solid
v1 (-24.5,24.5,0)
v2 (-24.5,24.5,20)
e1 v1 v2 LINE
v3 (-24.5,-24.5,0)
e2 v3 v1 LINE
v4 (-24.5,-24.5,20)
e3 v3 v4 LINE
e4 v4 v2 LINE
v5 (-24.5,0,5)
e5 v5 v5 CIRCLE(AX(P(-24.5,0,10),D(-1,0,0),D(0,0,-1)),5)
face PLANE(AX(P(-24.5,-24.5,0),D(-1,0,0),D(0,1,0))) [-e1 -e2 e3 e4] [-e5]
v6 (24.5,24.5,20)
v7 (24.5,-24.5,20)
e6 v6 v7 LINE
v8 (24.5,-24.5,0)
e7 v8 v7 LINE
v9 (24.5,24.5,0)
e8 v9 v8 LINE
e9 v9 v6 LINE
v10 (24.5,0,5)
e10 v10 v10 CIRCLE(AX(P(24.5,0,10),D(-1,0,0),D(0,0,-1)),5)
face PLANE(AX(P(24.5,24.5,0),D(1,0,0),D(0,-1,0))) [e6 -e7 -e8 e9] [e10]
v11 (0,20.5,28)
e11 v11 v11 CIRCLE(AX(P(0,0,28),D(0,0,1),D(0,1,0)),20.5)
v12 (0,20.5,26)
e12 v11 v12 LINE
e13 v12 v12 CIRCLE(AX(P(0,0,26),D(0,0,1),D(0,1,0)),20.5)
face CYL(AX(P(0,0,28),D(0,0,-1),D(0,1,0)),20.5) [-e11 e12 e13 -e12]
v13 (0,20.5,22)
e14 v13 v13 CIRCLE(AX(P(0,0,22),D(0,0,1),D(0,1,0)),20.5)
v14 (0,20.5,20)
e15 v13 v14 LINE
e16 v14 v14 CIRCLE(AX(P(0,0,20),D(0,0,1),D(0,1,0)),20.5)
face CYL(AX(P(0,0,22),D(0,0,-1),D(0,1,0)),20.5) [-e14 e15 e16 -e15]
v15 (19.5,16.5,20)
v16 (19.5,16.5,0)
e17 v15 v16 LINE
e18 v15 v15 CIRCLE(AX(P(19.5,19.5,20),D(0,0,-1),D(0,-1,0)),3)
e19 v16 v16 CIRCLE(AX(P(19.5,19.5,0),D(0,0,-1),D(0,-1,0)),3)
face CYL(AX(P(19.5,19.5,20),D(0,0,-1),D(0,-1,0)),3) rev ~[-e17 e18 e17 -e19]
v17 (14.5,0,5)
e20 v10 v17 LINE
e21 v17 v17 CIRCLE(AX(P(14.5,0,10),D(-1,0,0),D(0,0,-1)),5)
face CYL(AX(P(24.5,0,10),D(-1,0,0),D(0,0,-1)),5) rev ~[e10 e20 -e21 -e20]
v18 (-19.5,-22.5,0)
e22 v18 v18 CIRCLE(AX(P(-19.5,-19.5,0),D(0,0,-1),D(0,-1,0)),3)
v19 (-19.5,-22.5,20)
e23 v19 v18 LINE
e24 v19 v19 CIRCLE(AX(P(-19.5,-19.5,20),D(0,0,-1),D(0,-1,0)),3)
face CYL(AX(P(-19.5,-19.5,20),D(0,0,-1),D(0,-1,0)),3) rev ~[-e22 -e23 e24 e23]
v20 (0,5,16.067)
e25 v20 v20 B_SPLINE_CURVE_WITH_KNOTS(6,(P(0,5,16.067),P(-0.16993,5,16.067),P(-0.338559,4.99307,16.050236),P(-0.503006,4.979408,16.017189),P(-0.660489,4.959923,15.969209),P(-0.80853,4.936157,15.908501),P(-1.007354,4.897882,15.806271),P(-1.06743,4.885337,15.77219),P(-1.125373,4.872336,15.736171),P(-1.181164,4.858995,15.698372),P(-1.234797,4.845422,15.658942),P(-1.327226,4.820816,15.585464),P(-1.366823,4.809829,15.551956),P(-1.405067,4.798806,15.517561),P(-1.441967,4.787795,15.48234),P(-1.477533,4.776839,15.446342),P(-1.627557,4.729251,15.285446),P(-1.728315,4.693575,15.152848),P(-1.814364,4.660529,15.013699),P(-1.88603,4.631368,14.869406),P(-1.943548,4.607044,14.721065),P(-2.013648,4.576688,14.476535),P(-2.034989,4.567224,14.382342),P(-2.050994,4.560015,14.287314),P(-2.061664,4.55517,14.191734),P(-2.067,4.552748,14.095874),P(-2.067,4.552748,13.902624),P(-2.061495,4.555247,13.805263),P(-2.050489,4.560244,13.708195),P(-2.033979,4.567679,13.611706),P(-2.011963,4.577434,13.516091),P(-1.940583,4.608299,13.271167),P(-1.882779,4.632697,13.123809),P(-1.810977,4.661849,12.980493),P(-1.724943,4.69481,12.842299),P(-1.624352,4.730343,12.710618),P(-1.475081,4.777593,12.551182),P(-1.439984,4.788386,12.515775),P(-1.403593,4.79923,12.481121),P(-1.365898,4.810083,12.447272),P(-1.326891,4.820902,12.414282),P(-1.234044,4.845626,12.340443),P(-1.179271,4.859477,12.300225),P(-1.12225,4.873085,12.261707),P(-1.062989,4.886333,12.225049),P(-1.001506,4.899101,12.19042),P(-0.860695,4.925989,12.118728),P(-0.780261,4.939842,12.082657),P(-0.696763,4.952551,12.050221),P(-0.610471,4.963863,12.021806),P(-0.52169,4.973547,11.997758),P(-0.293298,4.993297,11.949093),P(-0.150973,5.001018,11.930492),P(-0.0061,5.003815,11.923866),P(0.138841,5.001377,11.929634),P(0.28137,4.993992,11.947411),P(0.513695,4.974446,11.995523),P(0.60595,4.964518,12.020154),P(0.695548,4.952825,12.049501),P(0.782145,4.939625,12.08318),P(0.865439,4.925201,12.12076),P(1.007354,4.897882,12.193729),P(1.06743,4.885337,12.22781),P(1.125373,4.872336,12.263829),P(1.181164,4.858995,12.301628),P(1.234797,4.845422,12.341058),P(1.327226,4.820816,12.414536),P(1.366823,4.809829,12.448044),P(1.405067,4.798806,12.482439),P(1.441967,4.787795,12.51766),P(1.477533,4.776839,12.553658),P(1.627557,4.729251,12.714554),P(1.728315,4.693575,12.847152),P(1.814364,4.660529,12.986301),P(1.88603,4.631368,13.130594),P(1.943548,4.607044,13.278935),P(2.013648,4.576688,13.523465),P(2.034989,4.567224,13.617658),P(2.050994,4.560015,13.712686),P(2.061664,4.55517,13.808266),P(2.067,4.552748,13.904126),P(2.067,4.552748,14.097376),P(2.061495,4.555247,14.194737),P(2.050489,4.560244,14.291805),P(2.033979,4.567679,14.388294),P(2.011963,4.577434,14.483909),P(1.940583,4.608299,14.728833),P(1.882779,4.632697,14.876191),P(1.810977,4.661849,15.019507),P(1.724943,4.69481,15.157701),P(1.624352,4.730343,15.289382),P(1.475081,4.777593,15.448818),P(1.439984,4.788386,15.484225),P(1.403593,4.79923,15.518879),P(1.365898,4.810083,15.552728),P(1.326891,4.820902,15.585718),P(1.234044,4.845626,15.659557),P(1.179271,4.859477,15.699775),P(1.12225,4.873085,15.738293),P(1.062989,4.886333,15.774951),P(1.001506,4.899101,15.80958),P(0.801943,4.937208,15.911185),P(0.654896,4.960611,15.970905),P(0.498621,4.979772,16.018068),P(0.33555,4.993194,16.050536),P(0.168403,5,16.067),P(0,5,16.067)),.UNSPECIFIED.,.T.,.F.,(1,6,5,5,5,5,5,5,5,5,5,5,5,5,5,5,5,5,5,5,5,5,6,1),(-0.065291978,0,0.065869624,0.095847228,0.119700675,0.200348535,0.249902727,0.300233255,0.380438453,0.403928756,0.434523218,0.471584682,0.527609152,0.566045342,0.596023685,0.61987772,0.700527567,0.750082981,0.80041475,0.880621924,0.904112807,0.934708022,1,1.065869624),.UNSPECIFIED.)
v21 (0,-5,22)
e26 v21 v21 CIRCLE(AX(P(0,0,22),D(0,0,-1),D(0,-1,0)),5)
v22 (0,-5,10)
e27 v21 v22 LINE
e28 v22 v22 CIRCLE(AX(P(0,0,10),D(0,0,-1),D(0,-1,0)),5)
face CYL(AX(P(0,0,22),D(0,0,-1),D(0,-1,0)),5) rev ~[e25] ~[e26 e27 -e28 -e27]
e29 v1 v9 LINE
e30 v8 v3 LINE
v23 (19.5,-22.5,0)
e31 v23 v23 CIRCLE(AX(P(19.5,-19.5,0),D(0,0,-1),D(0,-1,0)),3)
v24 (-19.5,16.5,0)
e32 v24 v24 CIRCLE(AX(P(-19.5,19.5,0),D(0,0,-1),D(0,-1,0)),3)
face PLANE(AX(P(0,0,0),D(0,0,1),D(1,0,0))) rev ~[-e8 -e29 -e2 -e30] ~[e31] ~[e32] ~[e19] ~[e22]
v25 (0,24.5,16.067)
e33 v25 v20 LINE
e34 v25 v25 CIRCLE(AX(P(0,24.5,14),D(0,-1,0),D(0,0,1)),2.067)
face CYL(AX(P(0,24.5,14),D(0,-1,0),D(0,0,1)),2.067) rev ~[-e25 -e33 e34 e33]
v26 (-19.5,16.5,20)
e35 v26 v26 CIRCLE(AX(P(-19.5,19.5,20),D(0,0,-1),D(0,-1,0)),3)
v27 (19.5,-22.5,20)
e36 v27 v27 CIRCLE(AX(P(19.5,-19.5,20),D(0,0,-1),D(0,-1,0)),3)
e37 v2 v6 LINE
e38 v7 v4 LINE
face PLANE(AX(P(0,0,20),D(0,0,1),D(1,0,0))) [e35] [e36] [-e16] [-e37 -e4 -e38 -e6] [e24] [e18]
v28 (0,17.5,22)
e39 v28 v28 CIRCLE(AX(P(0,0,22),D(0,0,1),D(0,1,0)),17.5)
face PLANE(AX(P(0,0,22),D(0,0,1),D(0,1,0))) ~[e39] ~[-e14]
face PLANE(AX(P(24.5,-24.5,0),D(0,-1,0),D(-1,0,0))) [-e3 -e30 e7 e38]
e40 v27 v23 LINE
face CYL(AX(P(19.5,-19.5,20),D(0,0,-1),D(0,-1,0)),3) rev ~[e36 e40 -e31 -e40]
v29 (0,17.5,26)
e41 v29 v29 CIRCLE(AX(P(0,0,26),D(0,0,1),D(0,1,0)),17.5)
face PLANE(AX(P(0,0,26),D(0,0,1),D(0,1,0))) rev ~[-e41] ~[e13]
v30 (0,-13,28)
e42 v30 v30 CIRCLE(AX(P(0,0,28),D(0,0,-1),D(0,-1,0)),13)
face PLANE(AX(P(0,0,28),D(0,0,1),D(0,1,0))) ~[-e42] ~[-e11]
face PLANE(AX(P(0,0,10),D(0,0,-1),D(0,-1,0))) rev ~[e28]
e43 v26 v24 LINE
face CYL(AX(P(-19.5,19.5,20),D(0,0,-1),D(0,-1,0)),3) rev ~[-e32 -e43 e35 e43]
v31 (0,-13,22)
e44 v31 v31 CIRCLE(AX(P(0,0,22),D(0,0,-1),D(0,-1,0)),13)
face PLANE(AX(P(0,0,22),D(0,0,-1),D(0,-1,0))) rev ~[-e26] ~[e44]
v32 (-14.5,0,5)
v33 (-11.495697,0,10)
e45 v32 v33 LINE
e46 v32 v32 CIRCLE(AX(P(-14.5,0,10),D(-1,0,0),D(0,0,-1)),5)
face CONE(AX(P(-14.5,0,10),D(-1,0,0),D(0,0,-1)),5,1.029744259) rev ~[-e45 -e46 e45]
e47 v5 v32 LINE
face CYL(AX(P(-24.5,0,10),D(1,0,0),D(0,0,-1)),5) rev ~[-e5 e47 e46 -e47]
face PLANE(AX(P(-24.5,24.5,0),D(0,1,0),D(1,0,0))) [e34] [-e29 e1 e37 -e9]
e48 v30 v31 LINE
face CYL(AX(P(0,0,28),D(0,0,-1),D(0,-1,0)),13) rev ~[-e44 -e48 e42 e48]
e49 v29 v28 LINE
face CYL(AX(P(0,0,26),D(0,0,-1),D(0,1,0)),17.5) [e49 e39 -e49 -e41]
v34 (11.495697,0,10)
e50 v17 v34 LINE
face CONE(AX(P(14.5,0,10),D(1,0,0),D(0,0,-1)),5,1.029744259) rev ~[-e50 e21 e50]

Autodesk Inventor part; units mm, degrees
ref_plane "XZ Plane" through (0, 0, 0) normal (0, 1, 0) x (-1, 0, 0)
ref_plane "XY Plane" through (0, 0, 0) normal (0, 0, 1) x (1, 0, 0)
sketch "Sketch1" plane through (0, 0, 0) normal (0, 0, 1) x (1, 0, 0)
  line L0 (-24.5, 24.5) -> (24.5, 24.5)
  line L1 (24.5, 24.5) -> (24.5, -24.5)
  line L2 (24.5, -24.5) -> (-24.5, -24.5)
  line L3 (-24.5, -24.5) -> (-24.5, 24.5)
  point P0 (0, 0)
  point P1 (-24.5, 0)
  point P2 (0, 24.5)
  dimension "Width" = 49
  dimension "Height" = 49
extrude "Extrusion1" add sketch "Sketch1" along normal blind 20
sketch "Sketch2" plane through (0, 0, 20) normal (0, 0, 1) x (1, 0, 0)
  line L0 (24.5, 24.5) -> (24.5, -24.5) projected
  line L1 (-24.5, 24.5) -> (24.5, 24.5) projected
  line L2 (-24.5, -24.5) -> (-24.5, 24.5) projected
  line L3 (24.5, -24.5) -> (-24.5, -24.5) projected
  line L4 (19.5, 19.5) -> (19.5, -19.5)
  line L5 (19.5, -19.5) -> (-19.5, -19.5)
  line L6 (-19.5, -19.5) -> (-19.5, 19.5)
  line L7 (-19.5, 19.5) -> (19.5, 19.5)
  point P0 (0, 0)
  dimension "d4" = 5
  dimension "d5" = 39
  dimension "d6" = 39
hole "Hole1" at (-19.5, -19.5, 20) direction (0, 0, -1) diameter 6 end through all
pattern_linear "Rectangular Pattern1" count 2 spacing 39 along (1, 0, 0) count 2 spacing 39 along (0, 1, 0) of "Hole1"
sketch "Sketch3" plane through (0, 0, 0) normal (1, 0, 0) x (0, 1, 0)
  line L0 (-24.5, 20) -> (24.5, 20) projected
  line L1 (0, 20) -> (0, 28)
  line L2 (0, 28) -> (20.5, 28)
  line L3 (20.5, 28) -> (20.5, 26)
  line L4 (20.5, 26) -> (17.5, 26)
  line L5 (17.5, 26) -> (17.5, 22)
  line L6 (17.5, 22) -> (20.5, 22)
  line L7 (20.5, 22) -> (20.5, 20)
  point P0 (0, 0)
  dimension "d25" = 8
  dimension "d26" = 20.5
  dimension "d27" = 2
  dimension "d28" = 4
  dimension "d29" = 17.5
revolve "Revolution1" add sketch "Sketch3" angle 360 about axis through (0, 0, 20) along (0, 0, 1)
sketch "Sketch4" plane through (-24.5, 24.5, 0) normal (0, 1, 0) x (1, 0, 0)
  line L0 (0, -20) -> (49, -20) projected
  line L1 (0, 0) -> (0, -20) projected
  line L2 (24.5, -20) -> (24.5, -14)
  point P0 (24.5, 0)
  dimension "d32" = 6
hole "Hole2" at (0, 0, 28) direction (0, 0, -1) diameter 10 depth 18 counterbore diameter 26 counterbore depth 6
hole "Hole3" at (0, 24.5, 14) direction (0, -1, 0) diameter 4.134 end up to surface thread size "M5x0.8" class "6H" standard "ANSI Metric M Profile"
sketch "Sketch6" plane through (24.5, -24.5, 0) normal (1, 0, 0) x (0, 0, -1)
  line L0 (0, 49) -> (0, 0) projected
  line L1 (0, 49) -> (-20, 49) projected
  point P0 (0, 24.5)
  point P1 (-10, 24.5)
  point P2 (0, 24.5)
  point P3 (-10, 49)
hole "Hole4" at (24.5, 0, 10) direction (-1, 0, 0) diameter 10 depth 10 tip angle 118
mirror "Mirror1" about plane through (0, 0, 0) normal (1, 0, 0) of "Hole4"
equation "\"Height\" = Width"
equation "\"d16\" = d5"
equation "\"d19\" = d6"
properties part number "TU-001" material "Steel, Mild"
